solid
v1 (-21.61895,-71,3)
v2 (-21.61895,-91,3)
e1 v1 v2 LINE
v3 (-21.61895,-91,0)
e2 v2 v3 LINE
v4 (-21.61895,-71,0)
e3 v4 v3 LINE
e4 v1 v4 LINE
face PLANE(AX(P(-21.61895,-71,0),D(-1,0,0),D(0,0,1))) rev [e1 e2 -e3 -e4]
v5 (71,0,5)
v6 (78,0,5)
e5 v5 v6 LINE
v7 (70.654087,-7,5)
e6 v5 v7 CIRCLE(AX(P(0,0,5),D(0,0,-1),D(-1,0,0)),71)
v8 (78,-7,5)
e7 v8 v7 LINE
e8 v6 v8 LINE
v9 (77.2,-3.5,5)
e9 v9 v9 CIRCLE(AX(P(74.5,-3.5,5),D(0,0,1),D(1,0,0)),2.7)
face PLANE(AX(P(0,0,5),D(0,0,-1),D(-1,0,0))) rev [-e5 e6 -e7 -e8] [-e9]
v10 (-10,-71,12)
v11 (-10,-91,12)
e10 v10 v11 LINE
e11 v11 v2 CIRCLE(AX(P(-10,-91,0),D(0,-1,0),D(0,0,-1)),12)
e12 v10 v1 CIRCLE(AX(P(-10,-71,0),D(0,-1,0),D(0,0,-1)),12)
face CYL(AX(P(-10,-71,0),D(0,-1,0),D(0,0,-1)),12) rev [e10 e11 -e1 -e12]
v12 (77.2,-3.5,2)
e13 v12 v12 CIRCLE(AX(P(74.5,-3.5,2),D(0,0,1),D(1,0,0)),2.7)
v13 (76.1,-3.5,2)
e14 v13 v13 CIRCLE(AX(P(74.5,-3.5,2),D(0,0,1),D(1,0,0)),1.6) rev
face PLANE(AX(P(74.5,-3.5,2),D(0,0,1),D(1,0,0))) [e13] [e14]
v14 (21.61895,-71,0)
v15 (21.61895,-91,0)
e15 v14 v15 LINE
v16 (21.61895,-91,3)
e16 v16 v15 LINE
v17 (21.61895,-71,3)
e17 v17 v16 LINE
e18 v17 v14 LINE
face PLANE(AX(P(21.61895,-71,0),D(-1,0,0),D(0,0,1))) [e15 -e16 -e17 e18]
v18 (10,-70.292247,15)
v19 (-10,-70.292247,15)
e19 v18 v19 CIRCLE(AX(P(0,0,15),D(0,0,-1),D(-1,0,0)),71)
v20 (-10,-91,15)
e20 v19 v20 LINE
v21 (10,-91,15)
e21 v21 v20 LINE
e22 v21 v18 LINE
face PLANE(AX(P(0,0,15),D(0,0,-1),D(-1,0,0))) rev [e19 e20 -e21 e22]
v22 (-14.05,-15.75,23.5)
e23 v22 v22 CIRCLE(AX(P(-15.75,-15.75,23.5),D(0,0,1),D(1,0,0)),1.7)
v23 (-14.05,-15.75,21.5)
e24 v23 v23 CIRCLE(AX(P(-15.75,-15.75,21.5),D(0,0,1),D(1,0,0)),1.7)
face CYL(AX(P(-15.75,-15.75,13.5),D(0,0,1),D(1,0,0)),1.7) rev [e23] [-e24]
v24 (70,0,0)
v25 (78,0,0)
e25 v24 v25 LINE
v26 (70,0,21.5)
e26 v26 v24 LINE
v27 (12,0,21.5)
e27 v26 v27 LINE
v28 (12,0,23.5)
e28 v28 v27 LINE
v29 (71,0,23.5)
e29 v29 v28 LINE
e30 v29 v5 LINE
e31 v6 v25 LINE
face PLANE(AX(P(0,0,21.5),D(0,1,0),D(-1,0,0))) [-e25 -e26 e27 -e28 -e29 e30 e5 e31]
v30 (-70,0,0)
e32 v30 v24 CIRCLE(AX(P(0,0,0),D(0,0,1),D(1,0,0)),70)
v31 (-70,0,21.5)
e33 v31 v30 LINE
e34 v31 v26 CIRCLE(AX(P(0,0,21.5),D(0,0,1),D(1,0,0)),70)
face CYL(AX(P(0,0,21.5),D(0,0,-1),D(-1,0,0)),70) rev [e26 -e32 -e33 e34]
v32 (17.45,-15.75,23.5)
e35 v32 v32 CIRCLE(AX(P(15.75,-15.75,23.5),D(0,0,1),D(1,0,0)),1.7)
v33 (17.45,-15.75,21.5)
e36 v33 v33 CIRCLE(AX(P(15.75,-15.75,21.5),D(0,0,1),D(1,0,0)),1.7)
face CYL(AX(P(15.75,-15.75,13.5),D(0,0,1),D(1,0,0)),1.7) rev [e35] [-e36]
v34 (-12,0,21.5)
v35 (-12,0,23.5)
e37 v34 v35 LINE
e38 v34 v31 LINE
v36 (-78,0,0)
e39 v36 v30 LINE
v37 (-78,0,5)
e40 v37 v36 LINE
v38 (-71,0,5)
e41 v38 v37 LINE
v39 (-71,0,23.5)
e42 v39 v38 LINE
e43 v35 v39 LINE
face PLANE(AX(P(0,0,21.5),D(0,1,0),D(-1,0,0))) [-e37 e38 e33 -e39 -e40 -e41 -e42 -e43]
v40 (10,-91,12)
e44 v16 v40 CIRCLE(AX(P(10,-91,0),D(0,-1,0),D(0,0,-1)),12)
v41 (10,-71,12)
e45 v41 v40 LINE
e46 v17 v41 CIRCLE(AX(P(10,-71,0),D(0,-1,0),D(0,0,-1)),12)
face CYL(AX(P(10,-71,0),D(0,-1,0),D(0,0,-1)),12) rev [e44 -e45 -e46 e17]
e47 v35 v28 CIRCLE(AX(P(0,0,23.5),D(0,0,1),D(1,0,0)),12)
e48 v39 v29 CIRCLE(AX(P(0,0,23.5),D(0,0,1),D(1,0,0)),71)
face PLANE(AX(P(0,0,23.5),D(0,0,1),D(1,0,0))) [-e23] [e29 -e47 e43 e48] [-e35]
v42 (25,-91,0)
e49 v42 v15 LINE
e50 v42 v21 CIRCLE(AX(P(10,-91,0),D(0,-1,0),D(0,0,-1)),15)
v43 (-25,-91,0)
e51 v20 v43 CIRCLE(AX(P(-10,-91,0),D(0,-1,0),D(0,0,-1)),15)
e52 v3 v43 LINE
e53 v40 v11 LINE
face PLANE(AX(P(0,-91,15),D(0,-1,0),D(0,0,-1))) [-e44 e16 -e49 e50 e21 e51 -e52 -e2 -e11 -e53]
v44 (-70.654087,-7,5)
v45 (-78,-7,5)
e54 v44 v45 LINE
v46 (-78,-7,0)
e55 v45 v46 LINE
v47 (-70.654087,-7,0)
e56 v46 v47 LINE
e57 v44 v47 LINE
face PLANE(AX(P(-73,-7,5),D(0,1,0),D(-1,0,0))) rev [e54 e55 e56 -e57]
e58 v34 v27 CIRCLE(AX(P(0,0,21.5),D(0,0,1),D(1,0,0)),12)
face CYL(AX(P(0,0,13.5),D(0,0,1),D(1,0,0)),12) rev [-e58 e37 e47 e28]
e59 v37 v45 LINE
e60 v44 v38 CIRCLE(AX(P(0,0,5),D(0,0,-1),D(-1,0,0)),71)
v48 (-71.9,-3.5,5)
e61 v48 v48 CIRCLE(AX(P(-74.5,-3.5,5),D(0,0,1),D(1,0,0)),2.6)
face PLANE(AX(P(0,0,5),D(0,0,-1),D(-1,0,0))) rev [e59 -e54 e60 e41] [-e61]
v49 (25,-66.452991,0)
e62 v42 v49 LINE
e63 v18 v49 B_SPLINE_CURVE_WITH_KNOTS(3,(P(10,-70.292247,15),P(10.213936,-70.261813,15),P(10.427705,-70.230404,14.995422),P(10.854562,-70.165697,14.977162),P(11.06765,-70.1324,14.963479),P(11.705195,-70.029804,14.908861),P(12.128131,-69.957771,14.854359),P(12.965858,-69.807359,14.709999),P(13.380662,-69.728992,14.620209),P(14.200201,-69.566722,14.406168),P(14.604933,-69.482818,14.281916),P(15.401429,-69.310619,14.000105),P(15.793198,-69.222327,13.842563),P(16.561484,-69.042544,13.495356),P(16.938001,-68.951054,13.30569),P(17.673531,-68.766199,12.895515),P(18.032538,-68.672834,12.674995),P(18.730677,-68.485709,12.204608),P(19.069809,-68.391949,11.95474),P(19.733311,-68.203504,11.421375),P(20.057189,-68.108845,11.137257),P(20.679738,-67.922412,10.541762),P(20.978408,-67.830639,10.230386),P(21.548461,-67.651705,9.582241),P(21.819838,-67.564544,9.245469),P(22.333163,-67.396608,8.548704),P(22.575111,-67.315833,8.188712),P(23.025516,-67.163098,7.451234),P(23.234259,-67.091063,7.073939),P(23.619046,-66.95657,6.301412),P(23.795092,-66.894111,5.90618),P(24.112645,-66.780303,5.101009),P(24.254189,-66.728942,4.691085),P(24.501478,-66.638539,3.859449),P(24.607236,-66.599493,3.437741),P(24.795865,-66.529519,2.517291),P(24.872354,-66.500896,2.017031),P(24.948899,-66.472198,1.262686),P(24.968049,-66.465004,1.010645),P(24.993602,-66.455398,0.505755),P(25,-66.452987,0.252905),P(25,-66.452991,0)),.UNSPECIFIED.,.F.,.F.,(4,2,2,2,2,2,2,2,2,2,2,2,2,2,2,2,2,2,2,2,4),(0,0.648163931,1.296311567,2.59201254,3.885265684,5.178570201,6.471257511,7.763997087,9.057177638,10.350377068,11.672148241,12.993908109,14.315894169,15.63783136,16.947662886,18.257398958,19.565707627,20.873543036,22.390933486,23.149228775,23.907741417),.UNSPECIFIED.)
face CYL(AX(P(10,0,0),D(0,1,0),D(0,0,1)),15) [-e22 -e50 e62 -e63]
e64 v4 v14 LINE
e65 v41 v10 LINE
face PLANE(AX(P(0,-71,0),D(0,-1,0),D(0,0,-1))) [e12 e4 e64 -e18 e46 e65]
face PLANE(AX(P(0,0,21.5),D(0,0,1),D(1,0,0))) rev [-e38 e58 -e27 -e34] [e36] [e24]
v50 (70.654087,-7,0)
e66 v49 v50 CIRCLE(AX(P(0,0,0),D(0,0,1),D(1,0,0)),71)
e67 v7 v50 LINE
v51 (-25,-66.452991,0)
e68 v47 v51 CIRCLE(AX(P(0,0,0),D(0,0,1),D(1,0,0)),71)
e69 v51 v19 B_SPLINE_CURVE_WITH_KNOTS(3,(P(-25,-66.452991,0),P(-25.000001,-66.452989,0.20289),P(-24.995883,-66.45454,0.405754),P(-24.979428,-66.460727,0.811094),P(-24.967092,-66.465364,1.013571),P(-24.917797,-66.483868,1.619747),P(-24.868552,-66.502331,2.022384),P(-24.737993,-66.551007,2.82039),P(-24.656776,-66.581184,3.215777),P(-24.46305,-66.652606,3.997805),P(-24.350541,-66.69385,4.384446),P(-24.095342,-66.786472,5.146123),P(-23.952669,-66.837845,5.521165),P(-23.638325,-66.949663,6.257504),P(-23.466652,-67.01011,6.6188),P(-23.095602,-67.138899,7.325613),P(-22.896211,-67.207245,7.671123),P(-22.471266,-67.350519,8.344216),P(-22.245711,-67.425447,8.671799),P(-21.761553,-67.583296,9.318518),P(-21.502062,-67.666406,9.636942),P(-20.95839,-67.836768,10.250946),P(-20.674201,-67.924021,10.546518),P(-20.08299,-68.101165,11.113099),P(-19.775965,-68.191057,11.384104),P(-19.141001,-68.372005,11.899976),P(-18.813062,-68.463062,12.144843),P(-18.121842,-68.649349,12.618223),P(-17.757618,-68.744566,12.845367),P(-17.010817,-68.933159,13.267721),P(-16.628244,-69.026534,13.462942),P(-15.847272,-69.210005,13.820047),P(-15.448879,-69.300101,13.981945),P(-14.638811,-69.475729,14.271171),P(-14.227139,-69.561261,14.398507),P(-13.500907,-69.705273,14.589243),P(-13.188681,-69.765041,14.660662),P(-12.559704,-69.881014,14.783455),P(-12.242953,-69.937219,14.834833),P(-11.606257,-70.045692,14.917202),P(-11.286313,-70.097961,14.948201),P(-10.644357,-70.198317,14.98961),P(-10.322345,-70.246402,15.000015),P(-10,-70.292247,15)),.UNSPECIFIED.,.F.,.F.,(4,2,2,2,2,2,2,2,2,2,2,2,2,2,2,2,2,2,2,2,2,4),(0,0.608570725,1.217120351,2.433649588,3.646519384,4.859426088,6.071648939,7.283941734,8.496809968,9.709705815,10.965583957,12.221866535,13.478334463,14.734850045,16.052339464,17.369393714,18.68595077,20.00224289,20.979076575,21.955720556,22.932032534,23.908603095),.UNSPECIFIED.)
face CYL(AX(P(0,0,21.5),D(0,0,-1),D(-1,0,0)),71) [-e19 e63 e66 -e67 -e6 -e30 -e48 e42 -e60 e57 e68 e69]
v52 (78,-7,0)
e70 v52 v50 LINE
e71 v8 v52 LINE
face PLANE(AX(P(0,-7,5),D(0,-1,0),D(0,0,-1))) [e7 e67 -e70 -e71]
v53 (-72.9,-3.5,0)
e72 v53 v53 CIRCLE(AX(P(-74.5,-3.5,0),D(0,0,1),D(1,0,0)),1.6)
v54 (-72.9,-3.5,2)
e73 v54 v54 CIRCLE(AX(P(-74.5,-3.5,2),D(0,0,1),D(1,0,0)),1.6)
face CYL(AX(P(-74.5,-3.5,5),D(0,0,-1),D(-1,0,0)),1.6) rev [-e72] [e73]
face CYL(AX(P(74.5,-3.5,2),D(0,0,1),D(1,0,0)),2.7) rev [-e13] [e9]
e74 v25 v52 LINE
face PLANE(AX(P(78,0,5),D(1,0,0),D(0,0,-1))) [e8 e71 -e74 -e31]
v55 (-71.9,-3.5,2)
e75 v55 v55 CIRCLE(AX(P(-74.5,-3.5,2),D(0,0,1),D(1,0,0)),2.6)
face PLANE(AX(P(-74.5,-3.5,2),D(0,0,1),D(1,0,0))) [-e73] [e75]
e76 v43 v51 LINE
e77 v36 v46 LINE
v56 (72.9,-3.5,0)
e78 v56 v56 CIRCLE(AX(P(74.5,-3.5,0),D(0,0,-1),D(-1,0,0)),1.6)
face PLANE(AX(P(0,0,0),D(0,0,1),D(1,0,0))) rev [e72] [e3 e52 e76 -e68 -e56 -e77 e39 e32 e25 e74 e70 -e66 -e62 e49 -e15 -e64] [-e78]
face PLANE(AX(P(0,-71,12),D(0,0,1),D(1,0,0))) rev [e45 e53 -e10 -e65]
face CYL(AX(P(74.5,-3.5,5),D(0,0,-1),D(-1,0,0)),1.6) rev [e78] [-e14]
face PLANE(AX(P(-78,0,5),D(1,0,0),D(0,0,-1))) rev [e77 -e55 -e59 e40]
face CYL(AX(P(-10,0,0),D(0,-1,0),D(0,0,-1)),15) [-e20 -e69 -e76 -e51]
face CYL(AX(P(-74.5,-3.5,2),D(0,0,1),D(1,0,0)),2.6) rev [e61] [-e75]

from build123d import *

# Parameters (mm, degrees)
BOSS_EXTRUDE1_DEPTH = 21.5
BOSS_EXTRUDE2_DEPTH = 2
SKETCH3_W           = 50
SKETCH3_H           = 20
BOSS_EXTRUDE3_DEPTH = 15
SKETCH8_R           = 1.6
BOSS_EXTRUDE5_DEPTH = 5
SKETCH10_R          = 2.7
SKETCH10_R_2        = 2.6
CUT_EXTRUDE5_DEPTH  = 3
FILLET2_R           = 15
SKETCH11_W          = 43.237900078
SKETCH11_H          = 3
CUT_EXTRUDE7_DEPTH  = 20
SKETCH13_R          = 1.7
CUT_EXTRUDE8_DEPTH  = 10
SKETCH14_R          = 12
CUT_EXTRUDE9_DEPTH  = 10


with BuildPart() as part:
    # Sketch1 → Boss-Extrude1 (new body)
    with BuildSketch(Plane.XY):
        with BuildLine():
            Line((71, 0), (70, 0))
            ThreePointArc((70, 0), (0, -70), (-70, 0))
            Line((-70, 0), (-71, 0))
            ThreePointArc((-71, 0), (0, -71), (71, 0))
        make_face()
    extrude(amount=BOSS_EXTRUDE1_DEPTH)

    # Sketch2 → Boss-Extrude2 (add)
    with BuildSketch(Plane.XY.offset(21.5)):
        with BuildLine():
            Line((71, 0), (70, 0))
            ThreePointArc((70, 0), (0, -70), (-70, 0))
            Line((-70, 0), (-71, 0))
            ThreePointArc((-71, 0), (0, -71), (71, 0))
        make_face()
        with BuildLine():
            Line((-21.5, 0), (-70, 0))
            ThreePointArc((-70, 0), (0, -70), (70, 0))
            Line((70, 0), (21.5, 0))
            Line((21.5, 0), (-21.5, 0))
        make_face()
    extrude(amount=BOSS_EXTRUDE2_DEPTH)

    # Sketch3 → Boss-Extrude3 (add)
    with BuildSketch(Plane(origin=(0, 0, 0), x_dir=(-1, 0, 0), z_dir=(0, 0, -1))):
        with BuildLine():
            Line((-25, -66.452990903), (-25, -71))
            Line((-25, -71), (0, -71))
            ThreePointArc((0, -71), (-12.705070757, -69.853999006), (-25, -66.452990903))
        make_face()
        with BuildLine():
            ThreePointArc((25, -66.452990903), (12.705070757, -69.853999006), (0, -71))
            Line((0, -71), (25, -71))
            Line((25, -71), (25, -66.452990903))
        make_face()
        with Locations((0, -81)):
            Rectangle(SKETCH3_W, SKETCH3_H)
    extrude(amount=-BOSS_EXTRUDE3_DEPTH)

    # Sketch8 → Boss-Extrude5 (add)
    # profile 1 of 2: a face of its own
    with BuildSketch(Plane(origin=(0, 0, 0), x_dir=(-1, 0, 0), z_dir=(0, 0, -1))):
        with BuildLine():
            ThreePointArc((-70.654086931, -7), (-70.913469003, -3.504270818), (-71, 0))
            Line((-71, 0), (-78, 0))
            Line((-78, 0), (-78, -7))
            Line((-78, -7), (-70.654086931, -7))
        make_face()
        with Locations((-74.5, -3.5)):
            Circle(SKETCH8_R, mode=Mode.SUBTRACT)
    # profile 2 of 2: a face of its own
    with BuildSketch(Plane(origin=(0, 0, 0), x_dir=(-1, 0, 0), z_dir=(0, 0, -1))):
        with BuildLine():
            Line((78, 0), (71, 0))
            ThreePointArc((71, 0), (70.913469003, -3.504270818), (70.654086931, -7))
            Line((70.654086931, -7), (78, -7))
            Line((78, -7), (78, 0))
        make_face()
        with Locations(Location((74.5, -3.5, 0), (0, 0, 180))):
            Circle(SKETCH8_R, mode=Mode.SUBTRACT)
    extrude(amount=-BOSS_EXTRUDE5_DEPTH)

    # Sketch10 → Cut-Extrude5 (cut)
    with BuildSketch(Plane.XY.offset(5)):
        with Locations((74.5, -3.5)):
            Circle(SKETCH10_R)
        with Locations((-74.5, -3.5)):
            Circle(SKETCH10_R_2)
    extrude(amount=-CUT_EXTRUDE5_DEPTH, mode=Mode.SUBTRACT)

    # Fillet2
    fillet2_edges = [part.edges().sort_by_distance(p)[0] for p in [
        (-25, -78.726495452, 15),
        (25, -78.726495452, 15),
    ]]
    fillet(fillet2_edges, radius=FILLET2_R - 0.0001)  # a hair under: the kernel refuses the full size

    # Sketch11 → Cut-Extrude7 (cut)
    with BuildSketch(Plane.XZ.offset(91)):
        with Locations((0, 1.5)):
            Rectangle(SKETCH11_W, SKETCH11_H)
        with BuildLine():
            Line((-21.618950039, 3), (21.618950039, 3))
            ThreePointArc((21.618950039, 3), (17.348469228, 9.486832981), (10, 12))
            Line((10, 12), (-10, 12))
            ThreePointArc((-10, 12), (-17.348469228, 9.486832981), (-21.618950039, 3))
        make_face()
    extrude(amount=-CUT_EXTRUDE7_DEPTH, mode=Mode.SUBTRACT)

    # Sketch13 → Cut-Extrude8 (cut)
    with BuildSketch(Plane.XY.offset(23.5)):
        with Locations((-15.75, -15.75)):
            Circle(SKETCH13_R)
        with Locations((15.75, -15.75)):
            Circle(SKETCH13_R)
    extrude(amount=-CUT_EXTRUDE8_DEPTH, mode=Mode.SUBTRACT)

    # Sketch14 → Cut-Extrude9 (cut)
    with BuildSketch(Plane.XY.offset(23.5)):
        Circle(SKETCH14_R)
    extrude(amount=-CUT_EXTRUDE9_DEPTH, mode=Mode.SUBTRACT)


solid = part.part
